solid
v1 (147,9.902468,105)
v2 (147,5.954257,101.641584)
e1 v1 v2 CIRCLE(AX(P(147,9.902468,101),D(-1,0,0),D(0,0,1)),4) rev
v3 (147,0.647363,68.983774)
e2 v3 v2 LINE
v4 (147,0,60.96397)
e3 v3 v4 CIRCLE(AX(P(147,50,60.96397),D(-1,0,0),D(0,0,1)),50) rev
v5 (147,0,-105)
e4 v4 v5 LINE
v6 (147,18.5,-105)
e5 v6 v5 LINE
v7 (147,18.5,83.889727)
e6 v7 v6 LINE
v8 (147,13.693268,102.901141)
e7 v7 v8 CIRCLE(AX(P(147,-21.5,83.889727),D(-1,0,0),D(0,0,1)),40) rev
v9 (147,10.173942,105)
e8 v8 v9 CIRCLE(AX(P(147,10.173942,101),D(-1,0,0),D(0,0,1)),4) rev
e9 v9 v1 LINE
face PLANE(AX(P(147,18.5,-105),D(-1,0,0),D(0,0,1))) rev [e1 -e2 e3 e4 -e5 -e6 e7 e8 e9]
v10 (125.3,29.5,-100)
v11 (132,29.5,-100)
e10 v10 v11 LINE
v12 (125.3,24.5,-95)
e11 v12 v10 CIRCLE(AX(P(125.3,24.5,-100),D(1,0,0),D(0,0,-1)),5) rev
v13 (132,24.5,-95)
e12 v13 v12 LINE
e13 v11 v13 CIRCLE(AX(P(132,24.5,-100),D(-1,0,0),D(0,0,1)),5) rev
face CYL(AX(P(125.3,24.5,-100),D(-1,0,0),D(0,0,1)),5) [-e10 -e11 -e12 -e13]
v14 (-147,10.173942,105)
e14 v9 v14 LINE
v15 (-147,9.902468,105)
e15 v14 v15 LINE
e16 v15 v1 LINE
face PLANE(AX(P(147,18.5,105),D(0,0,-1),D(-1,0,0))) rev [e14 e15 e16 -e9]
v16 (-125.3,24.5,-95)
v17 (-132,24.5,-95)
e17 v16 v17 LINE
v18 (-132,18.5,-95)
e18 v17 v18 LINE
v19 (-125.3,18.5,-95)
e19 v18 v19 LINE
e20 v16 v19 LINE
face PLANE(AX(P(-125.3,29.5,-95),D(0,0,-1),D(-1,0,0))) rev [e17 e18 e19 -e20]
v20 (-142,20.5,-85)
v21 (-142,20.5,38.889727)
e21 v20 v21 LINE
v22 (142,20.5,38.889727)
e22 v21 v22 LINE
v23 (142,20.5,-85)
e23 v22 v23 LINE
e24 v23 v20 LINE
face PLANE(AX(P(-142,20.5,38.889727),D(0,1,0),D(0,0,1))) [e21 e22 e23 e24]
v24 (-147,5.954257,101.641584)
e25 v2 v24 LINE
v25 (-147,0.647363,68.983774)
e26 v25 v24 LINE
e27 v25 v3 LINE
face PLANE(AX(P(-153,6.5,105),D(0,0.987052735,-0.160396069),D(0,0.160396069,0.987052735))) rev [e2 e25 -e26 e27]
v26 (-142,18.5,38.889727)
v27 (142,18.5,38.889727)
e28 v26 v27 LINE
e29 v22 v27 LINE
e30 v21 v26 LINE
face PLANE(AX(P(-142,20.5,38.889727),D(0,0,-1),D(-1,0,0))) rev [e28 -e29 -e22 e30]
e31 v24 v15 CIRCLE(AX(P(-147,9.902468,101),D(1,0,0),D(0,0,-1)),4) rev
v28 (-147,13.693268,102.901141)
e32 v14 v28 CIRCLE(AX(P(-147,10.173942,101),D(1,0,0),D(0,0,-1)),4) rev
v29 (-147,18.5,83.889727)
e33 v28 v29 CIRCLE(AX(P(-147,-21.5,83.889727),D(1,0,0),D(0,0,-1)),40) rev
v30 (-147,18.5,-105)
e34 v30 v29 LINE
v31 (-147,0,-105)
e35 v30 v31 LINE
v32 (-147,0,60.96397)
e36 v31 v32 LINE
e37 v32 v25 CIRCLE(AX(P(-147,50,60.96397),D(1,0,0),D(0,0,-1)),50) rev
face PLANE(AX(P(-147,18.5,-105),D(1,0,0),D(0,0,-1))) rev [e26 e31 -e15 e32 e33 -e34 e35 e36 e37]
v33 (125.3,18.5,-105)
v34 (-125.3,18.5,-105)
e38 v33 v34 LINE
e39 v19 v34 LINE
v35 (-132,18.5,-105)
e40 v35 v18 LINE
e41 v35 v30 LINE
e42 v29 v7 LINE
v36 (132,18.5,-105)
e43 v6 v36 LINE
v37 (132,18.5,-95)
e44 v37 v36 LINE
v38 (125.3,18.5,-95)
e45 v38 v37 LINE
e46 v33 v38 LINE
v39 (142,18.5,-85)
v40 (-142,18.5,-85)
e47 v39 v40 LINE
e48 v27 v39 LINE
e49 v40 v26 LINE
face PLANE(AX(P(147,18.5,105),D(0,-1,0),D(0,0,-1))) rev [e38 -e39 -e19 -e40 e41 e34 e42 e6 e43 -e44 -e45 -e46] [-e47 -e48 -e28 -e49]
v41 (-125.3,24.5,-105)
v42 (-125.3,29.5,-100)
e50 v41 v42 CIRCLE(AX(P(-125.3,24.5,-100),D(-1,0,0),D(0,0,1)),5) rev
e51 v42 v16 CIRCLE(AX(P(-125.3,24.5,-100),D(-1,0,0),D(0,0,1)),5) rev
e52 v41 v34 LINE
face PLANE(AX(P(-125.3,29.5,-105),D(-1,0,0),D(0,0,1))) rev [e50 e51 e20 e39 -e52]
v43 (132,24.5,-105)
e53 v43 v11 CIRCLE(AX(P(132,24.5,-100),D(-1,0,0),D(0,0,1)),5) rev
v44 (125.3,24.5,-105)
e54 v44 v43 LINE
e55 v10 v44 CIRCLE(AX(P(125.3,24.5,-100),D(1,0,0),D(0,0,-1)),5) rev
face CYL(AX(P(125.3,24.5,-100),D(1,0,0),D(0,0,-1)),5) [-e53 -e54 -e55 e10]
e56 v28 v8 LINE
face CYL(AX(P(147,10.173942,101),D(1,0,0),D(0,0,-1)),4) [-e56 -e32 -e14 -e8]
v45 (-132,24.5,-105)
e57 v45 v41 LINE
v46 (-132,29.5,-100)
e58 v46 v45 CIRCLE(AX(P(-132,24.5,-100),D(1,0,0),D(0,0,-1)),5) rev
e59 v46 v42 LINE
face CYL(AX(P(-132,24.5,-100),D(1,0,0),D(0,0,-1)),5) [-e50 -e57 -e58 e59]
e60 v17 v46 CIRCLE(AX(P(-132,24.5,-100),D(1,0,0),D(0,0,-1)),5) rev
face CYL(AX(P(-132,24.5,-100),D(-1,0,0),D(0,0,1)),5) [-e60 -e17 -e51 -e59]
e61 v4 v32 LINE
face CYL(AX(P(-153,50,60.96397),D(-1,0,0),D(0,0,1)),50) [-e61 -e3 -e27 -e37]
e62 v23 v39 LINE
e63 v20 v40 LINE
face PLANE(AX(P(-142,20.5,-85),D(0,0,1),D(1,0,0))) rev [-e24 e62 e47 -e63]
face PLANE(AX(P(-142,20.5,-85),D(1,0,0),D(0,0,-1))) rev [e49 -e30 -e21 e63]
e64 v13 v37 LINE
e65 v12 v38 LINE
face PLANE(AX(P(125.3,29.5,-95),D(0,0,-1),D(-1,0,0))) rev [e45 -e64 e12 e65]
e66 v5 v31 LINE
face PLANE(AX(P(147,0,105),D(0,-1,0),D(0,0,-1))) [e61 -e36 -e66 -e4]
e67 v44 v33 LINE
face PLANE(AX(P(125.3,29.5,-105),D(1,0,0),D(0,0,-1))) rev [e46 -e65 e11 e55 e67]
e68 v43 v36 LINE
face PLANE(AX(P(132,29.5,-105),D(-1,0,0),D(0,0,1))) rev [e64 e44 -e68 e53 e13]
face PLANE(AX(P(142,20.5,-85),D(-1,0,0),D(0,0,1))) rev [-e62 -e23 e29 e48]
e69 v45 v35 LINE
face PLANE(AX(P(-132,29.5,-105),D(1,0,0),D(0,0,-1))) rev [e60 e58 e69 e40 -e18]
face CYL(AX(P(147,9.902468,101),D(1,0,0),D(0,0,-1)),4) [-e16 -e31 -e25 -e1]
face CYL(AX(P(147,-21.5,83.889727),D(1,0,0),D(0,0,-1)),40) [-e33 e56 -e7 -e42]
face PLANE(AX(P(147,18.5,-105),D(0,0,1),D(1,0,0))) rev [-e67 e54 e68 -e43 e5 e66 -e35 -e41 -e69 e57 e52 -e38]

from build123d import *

# Parameters (mm, degrees)
SKETCH1_W           = 294
SKETCH1_H           = 210
BOSS_EXTRUDE1_DEPTH = 18.5
CUT_EXTRUDE1_DEPTH  = 300
CHAMFER1_SIZE       = 6
CHAMFER1_SIZE2      = 10.392304845
FILLET1_R           = 40
FILLET2_R           = 4
FILLET3_R           = 50
SKETCH3_W           = 6.7
SKETCH3_H           = 10
BOSS_EXTRUDE2_DEPTH = 11
FILLET4_R           = 5
SKETCH4_W           = 284
SKETCH4_H           = 123.889727457
BOSS_EXTRUDE3_DEPTH = 2


with BuildPart() as part:
    # Sketch1 → Boss-Extrude1 (new body)
    with BuildSketch(Plane(origin=(0, 0, 0), x_dir=(1, 0, 0), z_dir=(0, 1, 0))):
        Rectangle(SKETCH1_W, SKETCH1_H)
    extrude(amount=BOSS_EXTRUDE1_DEPTH)

    # Sketch2 → Cut-Extrude1 (cut)
    with BuildSketch(Plane(origin=(147, 0, 0), x_dir=(0, 0, -1), z_dir=(1, 0, 0))):
        Polygon((-105, 6.5), (-65, 0), (-105, 0), align=None)
    extrude(amount=-CUT_EXTRUDE1_DEPTH, mode=Mode.SUBTRACT)

    # Chamfer1
    chamfer1_edges = [part.edges().sort_by_distance(p)[0] for p in [
        (0, 18.5, 105),
    ]]
    chamfer1_side = [part.faces().sort_by_distance(p)[0] for p in [
        (0, 12.5, 105),
    ]]
    chamfer(chamfer1_edges, length=CHAMFER1_SIZE, length2=CHAMFER1_SIZE2, reference=chamfer1_side[0])

    # Fillet1
    fillet1_edges = [part.edges().sort_by_distance(p)[0] for p in [
        (0, 18.5, 94.607695155),
    ]]
    fillet(fillet1_edges, radius=FILLET1_R)

    # Fillet2
    fillet2_edges = [part.edges().sort_by_distance(p)[0] for p in [
        (0, 6.5, 105),
        (0, 12.5, 105),
    ]]
    fillet(fillet2_edges, radius=FILLET2_R)

    # Fillet3
    fillet3_edges = [part.edges().sort_by_distance(p)[0] for p in [
        (0, 0, 65),
    ]]
    fillet(fillet3_edges, radius=FILLET3_R)

    # Sketch3 → Boss-Extrude2 (add)
    with BuildSketch(Plane(origin=(0, 18.5, 0), x_dir=(1, 0, 0), z_dir=(0, 1, 0))):
        with Locations((128.65, 100)):
            Rectangle(SKETCH3_W, SKETCH3_H)
        with Locations((-128.65, 100)):
            Rectangle(SKETCH3_W, SKETCH3_H)
    extrude(amount=BOSS_EXTRUDE2_DEPTH)

    # Fillet4
    fillet4_edges = [part.edges().sort_by_distance(p)[0] for p in [
        (128.65, 29.5, -105),
        (128.65, 29.5, -95),
        (-128.65, 29.5, -105),
        (-128.65, 29.5, -95),
    ]]
    fillet(fillet4_edges, radius=FILLET4_R - 0.0001)  # a hair under: the kernel refuses the full size

    # Sketch4 → Boss-Extrude3 (add)
    with BuildSketch(Plane(origin=(0, 18.5, 0), x_dir=(1, 0, 0), z_dir=(0, 1, 0))):
        with Locations((0, 23.055136272)):
            Rectangle(SKETCH4_W, SKETCH4_H)
    extrude(amount=BOSS_EXTRUDE3_DEPTH)


solid = part.part
